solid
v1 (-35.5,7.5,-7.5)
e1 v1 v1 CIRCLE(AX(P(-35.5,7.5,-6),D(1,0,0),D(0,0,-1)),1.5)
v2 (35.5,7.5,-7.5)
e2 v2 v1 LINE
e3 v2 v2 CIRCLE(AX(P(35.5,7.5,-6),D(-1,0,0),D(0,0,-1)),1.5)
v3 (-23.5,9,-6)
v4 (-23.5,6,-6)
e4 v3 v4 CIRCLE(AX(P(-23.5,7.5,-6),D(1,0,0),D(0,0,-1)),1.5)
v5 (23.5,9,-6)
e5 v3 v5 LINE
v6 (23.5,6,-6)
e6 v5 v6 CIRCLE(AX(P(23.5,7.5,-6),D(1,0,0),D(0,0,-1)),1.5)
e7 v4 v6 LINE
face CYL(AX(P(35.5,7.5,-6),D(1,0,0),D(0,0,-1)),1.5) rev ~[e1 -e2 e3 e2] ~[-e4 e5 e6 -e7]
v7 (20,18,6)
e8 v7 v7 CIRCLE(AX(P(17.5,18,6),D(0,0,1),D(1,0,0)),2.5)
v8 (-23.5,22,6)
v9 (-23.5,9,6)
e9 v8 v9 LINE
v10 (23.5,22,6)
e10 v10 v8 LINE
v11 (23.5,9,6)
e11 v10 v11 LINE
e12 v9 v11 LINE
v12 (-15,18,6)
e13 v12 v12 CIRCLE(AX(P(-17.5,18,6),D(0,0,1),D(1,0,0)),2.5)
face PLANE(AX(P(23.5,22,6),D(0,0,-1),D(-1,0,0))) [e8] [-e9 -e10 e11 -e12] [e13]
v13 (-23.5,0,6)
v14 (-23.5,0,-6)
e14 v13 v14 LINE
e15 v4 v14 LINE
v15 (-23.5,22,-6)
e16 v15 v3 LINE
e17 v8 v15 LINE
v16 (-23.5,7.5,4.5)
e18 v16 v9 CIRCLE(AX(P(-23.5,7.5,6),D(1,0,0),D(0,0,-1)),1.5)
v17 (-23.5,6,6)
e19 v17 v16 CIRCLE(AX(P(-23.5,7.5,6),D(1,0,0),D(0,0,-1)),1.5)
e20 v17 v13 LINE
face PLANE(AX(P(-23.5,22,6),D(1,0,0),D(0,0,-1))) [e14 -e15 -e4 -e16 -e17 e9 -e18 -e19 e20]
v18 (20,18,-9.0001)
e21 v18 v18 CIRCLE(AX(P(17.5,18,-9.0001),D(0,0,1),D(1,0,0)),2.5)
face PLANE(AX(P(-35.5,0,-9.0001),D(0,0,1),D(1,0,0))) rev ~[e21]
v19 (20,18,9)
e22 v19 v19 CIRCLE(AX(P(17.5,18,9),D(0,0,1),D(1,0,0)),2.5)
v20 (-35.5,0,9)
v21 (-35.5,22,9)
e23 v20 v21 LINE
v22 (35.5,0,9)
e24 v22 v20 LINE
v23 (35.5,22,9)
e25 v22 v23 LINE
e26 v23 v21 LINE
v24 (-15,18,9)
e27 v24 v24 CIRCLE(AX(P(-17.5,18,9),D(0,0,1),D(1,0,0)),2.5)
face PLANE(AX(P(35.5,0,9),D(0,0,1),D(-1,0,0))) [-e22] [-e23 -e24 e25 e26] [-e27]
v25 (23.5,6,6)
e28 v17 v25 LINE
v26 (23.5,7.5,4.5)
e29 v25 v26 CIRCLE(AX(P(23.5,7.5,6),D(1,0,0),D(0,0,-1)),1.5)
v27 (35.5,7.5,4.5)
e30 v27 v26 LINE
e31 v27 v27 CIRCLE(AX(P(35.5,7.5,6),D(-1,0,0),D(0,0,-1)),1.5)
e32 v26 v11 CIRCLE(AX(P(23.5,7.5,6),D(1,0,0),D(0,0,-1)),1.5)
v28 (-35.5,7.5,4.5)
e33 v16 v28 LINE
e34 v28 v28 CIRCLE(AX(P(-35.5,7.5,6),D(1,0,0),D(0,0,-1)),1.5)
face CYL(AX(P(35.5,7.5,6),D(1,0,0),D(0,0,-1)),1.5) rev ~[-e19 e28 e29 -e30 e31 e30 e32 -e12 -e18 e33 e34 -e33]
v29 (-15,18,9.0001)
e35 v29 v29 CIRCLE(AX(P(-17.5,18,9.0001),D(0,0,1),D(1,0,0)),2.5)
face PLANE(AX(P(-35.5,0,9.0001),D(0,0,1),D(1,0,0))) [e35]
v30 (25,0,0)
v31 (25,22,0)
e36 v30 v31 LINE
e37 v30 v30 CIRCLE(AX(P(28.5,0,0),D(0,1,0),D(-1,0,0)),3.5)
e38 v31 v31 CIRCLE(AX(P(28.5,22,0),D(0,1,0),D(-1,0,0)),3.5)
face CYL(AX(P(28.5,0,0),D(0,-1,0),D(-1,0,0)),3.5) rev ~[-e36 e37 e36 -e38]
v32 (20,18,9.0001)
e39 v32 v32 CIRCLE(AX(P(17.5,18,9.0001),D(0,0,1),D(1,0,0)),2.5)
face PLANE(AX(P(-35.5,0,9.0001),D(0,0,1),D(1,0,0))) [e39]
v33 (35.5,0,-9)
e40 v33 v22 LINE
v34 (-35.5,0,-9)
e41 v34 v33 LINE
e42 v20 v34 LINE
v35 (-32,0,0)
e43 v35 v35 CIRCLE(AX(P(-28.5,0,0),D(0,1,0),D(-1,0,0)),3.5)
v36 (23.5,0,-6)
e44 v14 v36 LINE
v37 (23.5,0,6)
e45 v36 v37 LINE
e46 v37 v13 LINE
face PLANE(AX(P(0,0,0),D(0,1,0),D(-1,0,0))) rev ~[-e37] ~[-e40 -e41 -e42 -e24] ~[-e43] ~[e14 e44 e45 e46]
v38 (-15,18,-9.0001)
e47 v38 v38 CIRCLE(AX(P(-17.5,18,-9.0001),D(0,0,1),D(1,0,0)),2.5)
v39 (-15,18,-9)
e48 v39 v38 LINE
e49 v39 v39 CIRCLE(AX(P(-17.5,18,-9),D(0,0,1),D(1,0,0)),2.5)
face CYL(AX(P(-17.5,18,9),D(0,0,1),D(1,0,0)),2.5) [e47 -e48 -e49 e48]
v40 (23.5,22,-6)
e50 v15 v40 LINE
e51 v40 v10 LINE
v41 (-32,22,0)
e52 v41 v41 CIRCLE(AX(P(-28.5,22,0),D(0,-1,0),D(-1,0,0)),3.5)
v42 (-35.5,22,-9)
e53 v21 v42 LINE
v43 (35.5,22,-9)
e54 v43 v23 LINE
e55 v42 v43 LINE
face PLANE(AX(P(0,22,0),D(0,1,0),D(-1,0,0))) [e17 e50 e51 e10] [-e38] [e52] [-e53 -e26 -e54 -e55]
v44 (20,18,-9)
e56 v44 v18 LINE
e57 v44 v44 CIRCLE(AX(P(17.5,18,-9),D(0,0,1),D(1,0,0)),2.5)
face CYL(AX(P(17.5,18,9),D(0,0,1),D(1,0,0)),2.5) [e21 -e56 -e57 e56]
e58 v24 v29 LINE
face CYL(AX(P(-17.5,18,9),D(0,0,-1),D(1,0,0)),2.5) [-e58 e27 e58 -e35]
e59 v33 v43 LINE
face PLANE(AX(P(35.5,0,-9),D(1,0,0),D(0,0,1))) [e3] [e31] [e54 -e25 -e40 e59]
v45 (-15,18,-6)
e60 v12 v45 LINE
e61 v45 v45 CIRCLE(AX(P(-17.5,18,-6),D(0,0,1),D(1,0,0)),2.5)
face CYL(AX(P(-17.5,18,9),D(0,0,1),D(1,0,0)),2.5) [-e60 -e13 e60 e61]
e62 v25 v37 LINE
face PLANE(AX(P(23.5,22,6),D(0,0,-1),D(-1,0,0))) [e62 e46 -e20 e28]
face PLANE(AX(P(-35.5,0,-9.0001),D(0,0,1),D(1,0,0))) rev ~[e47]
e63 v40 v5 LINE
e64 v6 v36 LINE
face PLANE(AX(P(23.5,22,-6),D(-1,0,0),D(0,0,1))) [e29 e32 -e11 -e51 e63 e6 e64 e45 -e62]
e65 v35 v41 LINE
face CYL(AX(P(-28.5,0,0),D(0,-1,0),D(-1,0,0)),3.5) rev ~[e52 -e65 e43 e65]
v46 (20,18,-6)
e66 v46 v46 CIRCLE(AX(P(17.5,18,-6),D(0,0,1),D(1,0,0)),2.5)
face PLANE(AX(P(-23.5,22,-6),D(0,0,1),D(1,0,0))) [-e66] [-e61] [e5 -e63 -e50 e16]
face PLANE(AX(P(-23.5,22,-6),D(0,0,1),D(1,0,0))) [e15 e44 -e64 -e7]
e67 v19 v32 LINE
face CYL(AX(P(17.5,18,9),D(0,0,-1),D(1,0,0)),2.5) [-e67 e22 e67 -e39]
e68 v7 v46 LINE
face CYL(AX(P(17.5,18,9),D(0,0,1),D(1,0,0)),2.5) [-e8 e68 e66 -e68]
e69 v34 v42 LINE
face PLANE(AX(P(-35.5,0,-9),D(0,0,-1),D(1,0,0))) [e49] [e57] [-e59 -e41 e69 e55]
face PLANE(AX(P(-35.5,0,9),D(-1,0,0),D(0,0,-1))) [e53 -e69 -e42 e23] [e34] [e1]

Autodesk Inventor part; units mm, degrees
ref_plane "YZ Plane" through (0, 0, 0) normal (1, 0, 0) x (0, 1, 0)
ref_plane "XZ Plane" through (0, 0, 0) normal (0, 1, 0) x (-1, 0, 0)
ref_plane "XY Plane" through (0, 0, 0) normal (0, 0, 1) x (1, 0, 0)
sketch "Esquisse1" plane through (0, 0, 0) normal (0, 1, 0) x (-1, 0, 0)
  circle A0 centre (-28.5, 0) radius 3.5
  circle A1 centre (28.5, 0) radius 3.5
  line L0 (-35.5, 9) -> (35.5, 9)
  line L1 (35.5, 9) -> (35.5, -9)
  line L2 (35.5, -9) -> (-35.5, -9)
  line L3 (-35.5, -9) -> (-35.5, 9)
  line L4 (-28.5, 0) -> (28.5, 0)
  point P0 (0, 0)
  dimension "d0" = 7
  dimension "d1" = 7
  dimension "d2" = 28.5
  dimension "d3" = 28.5
  dimension "d4" = 18
  dimension "d5" = 9
  dimension "d6" = 7
  dimension "d7" = 7
extrude "Extrusion1" add sketch "Esquisse1" along normal blind 22
sketch "Esquisse2" plane through (0, 22, 0) normal (0, 1, 0) x (1, 0, 0)
  circle A0 centre (-28.5, 0) radius 3.5 projected
  circle A1 centre (28.5, 0) radius 3.5 projected
  line L0 (-23.5, 6) -> (23.5, 6)
  line L1 (23.5, 6) -> (23.5, -6)
  line L2 (23.5, -6) -> (-23.5, -6)
  line L3 (-23.5, -6) -> (-23.5, 6)
  point P0 (0, 0)
  dimension "d10" = 12
  dimension "d11" = 6
  dimension "d12" = 5
  dimension "d13" = 5
extrude "Extrusion2" cut sketch "Esquisse2" against normal through all contours L0 L1 L2 L3
sketch "Esquisse3" plane through (-35.5, 0, 9) normal (0, 0, 1) x (1, 0, 0)
  line L0 (71, 0) -> (0, 0) projected
  line L1 (71, 0) -> (71, 22) projected
  line L2 (0, 22) -> (71, 22) projected
  line L3 (0, 0) -> (0, 22) projected
  line L4 (14, 22) -> (57, 22)
  line L5 (57, 22) -> (57, 0)
  line L6 (57, 0) -> (14, 0)
  line L7 (14, 0) -> (14, 22)
  line L8 (14, 22) -> (22, 22)
  line L9 (22, 22) -> (22, 14)
  line L10 (22, 14) -> (14, 14)
  line L11 (14, 14) -> (14, 22)
  line L12 (57, 22) -> (49, 22)
  line L13 (49, 22) -> (49, 14)
  line L14 (49, 14) -> (57, 14)
  line L15 (57, 14) -> (57, 22)
  line L16 (14, 22) -> (22, 14)
  line L17 (22, 22) -> (14, 14)
  line L18 (49, 14) -> (57, 22)
  line L19 (49, 22) -> (57, 14)
  circle A0 centre (18, 18) radius 2.5
  circle A1 centre (53, 18) radius 2.5
  point P0 (35.5, 0)
  dimension "d16" = 14
  dimension "d17" = 14
  dimension "d18" = 8
  dimension "d19" = 8
  dimension "d20" = 8
  dimension "d21" = 8
  dimension "d22" = 5
  dimension "d23" = 5
sketch "Esquisse3 outline for Extrusion3" plane through (-35.5, 0, 9) normal (0, 0, 1) x (1, 0, 0)
  circle A0 centre (18, 18) radius 2.5
  circle A1 centre (53, 18) radius 2.5
extrude "Extrusion3" add sketch "Esquisse3 outline for Extrusion3" along normal through all both and the other way through all
sketch "Esquisse4" plane through (35.5, 0, 9) normal (1, 0, 0) x (0, 0, -1)
  line L0 (18, 0) -> (0, 0) projected
  line L1 (0, 22) -> (18, 22) projected
  line L2 (6, 22) -> (12, 22)
  line L3 (12, 22) -> (12, 0)
  line L4 (12, 0) -> (6, 0)
  line L5 (6, 0) -> (6, 22)
  circle A0 centre (3, 7.5) radius 1.5
  circle A1 centre (15, 7.5) radius 1.5
  line L6 (18, 0) -> (18, 22) projected
  line L7 (0, 0) -> (6, 0)
  line L8 (6, 0) -> (6, 15)
  line L9 (6, 15) -> (0, 15)
  line L10 (0, 15) -> (0, 0)
  line L11 (12, 0) -> (18, 0)
  line L12 (18, 0) -> (18, 15)
  line L13 (18, 15) -> (12, 15)
  line L14 (12, 15) -> (12, 0)
  line L15 (0, 15) -> (6, 0)
  line L16 (6, 15) -> (0, 0)
  line L17 (12, 15) -> (18, 0)
  line L18 (18, 15) -> (12, 0)
  point P0 (9, 0)
  point P1 (3, 7.5)
  point P2 (15, 7.5)
  dimension "d26" = 6
  dimension "d27" = 3
  dimension "d28" = 3
  dimension "d29" = 3
  dimension "d32" = 15
extrude "Extrusion4" cut sketch "Esquisse4" against normal through all contours L17 L18 A1 | A1 L18 L17 | A1 L17 L18 | L18 L17 A1 | L15 L16 A0 | A0 L16 L15 | A0 L15 L16 | L16 L15 A0
equation "\"d3\" = d2"
equation "\"d5\" = 0.5 * d4"
equation "\"d11\" = 0.5 * d10"
equation "\"d17\" = d16"
equation "\"d27\" = 0.5 * d26"
properties part number "tendeur_base"
